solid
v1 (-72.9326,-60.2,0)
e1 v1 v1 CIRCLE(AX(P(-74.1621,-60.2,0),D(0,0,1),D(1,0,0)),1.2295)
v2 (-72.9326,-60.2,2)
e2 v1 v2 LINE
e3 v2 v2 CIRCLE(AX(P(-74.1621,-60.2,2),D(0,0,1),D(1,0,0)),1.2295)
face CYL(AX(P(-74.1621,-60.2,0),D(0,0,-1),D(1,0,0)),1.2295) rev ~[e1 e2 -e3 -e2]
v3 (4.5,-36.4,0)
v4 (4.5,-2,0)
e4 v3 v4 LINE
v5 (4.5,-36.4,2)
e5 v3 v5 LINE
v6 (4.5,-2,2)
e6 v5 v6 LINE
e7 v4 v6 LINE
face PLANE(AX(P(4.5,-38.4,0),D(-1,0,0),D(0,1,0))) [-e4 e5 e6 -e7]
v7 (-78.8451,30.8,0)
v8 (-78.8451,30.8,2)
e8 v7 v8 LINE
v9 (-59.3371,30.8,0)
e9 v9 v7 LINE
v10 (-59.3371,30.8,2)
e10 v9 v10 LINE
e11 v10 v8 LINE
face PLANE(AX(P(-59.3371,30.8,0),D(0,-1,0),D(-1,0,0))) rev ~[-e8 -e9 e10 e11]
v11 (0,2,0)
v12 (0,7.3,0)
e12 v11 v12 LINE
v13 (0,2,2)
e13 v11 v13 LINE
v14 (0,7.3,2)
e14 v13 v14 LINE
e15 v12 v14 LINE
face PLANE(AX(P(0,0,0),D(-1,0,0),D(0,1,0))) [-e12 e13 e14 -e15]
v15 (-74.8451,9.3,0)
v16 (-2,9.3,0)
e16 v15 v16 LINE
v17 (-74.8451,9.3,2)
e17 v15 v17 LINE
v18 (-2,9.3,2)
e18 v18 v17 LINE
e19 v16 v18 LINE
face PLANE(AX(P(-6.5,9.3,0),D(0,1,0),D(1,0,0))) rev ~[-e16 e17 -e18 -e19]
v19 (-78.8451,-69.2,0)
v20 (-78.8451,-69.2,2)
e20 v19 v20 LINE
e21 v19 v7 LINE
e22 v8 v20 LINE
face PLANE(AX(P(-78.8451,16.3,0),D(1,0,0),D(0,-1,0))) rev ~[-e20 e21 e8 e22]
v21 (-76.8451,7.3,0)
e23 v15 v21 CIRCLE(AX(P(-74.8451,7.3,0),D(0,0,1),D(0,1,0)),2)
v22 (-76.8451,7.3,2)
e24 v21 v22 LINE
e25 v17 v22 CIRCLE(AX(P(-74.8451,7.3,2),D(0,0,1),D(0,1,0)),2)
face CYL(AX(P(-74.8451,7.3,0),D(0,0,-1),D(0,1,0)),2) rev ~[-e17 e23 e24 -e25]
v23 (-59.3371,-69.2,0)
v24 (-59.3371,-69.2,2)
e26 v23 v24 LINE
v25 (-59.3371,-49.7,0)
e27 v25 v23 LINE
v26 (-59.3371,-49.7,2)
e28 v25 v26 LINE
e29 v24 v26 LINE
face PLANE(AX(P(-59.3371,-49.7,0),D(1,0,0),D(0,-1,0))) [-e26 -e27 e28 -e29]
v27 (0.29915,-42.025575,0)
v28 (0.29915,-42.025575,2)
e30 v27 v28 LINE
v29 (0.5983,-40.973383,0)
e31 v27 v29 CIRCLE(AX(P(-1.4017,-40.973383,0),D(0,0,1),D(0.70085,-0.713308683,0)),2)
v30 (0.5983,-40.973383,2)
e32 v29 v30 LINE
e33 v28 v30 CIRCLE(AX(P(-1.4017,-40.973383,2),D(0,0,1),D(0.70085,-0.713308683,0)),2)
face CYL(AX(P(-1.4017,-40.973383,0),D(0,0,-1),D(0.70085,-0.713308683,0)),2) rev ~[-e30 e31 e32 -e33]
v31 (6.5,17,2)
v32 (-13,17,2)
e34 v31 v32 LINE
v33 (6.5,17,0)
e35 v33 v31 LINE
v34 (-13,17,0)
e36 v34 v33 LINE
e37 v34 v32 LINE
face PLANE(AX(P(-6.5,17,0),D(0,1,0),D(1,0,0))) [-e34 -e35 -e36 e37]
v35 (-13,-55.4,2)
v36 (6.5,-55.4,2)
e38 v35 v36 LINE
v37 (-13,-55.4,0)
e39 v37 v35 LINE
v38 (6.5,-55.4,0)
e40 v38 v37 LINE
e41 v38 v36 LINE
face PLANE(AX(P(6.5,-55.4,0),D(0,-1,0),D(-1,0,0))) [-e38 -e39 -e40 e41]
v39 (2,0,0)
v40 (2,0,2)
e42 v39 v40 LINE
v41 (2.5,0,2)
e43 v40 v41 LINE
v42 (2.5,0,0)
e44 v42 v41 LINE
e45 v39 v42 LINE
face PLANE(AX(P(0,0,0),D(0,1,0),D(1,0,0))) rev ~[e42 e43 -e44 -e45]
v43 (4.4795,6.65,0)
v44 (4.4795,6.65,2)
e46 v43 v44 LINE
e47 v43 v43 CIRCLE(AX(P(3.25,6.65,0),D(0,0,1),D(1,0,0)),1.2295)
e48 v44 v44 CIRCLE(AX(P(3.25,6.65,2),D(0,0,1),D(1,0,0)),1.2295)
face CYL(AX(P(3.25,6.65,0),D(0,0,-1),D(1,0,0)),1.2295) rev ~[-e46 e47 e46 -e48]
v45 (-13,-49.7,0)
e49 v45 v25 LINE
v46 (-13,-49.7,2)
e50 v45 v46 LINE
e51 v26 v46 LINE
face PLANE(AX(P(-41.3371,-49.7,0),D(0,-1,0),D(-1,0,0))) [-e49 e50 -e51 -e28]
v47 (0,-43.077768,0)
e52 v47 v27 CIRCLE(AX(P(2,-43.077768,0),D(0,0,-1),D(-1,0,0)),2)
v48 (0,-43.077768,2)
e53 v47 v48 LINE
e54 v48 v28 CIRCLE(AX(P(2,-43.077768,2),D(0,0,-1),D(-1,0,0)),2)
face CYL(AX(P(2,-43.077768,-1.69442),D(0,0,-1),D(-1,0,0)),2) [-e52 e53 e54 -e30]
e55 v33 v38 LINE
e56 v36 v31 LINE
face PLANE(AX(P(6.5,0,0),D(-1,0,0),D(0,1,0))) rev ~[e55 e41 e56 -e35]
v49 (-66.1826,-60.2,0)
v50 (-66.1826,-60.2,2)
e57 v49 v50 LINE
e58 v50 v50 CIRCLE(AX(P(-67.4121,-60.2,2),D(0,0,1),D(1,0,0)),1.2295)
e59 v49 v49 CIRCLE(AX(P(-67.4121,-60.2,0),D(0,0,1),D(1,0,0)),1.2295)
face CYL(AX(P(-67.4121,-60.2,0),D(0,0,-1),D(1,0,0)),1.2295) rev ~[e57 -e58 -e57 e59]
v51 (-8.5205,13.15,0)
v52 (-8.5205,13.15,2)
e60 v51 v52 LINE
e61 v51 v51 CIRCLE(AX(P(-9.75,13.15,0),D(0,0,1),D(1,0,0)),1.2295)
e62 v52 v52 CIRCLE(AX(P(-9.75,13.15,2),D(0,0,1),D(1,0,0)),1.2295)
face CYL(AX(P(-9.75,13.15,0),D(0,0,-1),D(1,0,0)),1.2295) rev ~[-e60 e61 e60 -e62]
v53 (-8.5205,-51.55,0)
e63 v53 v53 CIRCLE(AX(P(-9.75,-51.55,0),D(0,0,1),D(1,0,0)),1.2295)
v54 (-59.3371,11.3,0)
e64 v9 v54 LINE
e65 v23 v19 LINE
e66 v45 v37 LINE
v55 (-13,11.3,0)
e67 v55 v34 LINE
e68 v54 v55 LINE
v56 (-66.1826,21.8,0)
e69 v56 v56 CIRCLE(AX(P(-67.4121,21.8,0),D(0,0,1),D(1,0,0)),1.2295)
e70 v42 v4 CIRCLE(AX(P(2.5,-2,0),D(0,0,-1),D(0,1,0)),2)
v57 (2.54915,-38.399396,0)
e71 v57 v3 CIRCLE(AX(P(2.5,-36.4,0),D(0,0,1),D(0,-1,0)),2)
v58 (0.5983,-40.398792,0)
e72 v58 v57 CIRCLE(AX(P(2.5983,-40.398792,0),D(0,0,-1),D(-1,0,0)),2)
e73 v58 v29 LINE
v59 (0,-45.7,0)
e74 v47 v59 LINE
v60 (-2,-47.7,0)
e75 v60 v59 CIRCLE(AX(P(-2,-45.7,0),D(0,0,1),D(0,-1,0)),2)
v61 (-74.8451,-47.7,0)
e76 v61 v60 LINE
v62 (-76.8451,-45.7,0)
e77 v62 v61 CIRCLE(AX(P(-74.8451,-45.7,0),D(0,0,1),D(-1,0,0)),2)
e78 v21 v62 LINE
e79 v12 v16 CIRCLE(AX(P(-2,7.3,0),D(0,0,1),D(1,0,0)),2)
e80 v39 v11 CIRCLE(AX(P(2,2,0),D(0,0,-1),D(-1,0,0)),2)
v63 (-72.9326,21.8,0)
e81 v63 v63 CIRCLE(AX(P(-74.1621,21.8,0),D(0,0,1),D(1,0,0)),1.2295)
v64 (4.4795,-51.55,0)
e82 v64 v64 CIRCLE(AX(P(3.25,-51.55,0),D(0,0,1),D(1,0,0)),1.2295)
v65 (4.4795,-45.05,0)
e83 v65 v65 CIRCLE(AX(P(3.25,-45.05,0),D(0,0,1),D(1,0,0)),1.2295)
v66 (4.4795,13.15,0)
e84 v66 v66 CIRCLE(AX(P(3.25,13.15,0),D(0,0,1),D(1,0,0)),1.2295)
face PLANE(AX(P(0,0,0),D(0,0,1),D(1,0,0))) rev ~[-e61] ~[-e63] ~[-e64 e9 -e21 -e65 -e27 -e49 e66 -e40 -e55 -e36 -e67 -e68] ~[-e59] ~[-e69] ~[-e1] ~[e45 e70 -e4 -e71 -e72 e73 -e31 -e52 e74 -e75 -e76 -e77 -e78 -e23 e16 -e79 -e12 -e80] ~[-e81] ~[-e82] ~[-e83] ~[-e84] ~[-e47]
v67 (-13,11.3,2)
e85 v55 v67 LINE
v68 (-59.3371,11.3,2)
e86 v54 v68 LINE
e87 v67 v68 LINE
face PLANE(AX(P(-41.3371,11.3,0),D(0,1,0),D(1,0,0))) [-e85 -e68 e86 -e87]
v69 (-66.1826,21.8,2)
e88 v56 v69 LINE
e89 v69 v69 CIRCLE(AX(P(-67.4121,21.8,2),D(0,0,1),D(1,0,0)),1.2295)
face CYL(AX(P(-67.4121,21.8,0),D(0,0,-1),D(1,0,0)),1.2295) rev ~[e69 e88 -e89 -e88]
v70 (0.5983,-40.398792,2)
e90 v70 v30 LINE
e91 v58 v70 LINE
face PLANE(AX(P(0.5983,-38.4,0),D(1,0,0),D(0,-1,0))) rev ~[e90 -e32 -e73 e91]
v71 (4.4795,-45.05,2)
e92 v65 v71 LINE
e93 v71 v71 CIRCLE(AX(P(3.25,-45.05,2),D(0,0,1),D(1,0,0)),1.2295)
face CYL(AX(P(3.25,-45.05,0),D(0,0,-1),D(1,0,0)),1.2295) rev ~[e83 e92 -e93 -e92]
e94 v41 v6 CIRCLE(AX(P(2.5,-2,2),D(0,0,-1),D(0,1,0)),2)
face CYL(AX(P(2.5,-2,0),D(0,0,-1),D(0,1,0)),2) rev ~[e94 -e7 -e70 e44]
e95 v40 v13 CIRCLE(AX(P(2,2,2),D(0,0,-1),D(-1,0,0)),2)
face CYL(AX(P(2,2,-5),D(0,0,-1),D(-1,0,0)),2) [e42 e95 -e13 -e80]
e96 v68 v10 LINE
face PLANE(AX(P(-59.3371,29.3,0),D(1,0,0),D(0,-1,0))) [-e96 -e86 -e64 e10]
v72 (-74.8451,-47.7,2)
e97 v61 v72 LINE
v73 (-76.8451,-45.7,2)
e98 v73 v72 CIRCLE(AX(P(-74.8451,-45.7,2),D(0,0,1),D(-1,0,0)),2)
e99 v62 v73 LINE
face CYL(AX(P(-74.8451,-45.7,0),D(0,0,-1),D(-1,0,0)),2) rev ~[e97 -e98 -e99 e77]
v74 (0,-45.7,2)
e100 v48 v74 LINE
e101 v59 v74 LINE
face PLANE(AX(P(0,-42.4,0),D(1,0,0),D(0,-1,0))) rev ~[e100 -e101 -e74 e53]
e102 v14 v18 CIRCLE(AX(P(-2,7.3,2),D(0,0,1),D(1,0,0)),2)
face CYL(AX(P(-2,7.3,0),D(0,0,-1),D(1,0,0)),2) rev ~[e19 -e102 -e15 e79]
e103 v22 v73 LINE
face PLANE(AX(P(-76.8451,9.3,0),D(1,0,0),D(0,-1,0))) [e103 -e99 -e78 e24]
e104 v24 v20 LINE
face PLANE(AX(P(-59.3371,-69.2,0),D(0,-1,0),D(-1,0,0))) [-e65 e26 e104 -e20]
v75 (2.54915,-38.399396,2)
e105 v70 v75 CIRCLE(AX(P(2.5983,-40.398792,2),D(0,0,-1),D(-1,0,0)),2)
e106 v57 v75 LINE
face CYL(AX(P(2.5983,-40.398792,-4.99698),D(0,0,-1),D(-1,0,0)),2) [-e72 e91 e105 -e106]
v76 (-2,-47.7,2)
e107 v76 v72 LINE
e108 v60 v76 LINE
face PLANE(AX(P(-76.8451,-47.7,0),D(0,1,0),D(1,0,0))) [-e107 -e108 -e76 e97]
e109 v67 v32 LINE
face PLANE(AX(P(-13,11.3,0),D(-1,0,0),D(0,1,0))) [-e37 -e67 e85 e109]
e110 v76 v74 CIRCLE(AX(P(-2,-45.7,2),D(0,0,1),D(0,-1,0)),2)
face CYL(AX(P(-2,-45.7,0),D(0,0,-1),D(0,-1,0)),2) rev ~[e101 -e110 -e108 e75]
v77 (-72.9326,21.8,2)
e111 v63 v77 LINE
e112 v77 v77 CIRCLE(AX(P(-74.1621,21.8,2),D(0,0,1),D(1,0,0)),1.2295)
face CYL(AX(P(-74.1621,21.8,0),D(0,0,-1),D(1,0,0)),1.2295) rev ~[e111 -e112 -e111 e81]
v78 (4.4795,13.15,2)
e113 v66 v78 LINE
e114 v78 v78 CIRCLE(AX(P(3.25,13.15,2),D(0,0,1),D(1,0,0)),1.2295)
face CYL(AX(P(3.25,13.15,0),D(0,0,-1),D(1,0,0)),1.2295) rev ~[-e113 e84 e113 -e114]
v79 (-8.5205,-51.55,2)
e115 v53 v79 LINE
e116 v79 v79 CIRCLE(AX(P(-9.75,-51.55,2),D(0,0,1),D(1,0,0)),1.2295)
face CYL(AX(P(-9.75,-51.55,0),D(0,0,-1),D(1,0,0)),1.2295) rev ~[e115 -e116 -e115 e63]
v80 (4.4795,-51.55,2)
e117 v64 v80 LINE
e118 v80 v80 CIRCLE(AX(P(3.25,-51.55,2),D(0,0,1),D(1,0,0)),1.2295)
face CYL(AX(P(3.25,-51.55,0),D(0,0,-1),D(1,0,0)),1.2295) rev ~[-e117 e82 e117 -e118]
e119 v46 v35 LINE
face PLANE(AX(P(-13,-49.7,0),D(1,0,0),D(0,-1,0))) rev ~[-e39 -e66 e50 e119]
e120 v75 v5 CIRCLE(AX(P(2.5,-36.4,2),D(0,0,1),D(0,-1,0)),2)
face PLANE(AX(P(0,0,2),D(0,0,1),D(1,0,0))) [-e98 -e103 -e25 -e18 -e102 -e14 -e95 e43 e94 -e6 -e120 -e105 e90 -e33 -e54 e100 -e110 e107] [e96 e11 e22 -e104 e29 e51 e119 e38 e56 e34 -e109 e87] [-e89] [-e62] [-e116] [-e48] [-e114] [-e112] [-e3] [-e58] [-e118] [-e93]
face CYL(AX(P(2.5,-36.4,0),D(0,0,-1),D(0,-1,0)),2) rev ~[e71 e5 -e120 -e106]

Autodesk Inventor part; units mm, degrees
ref_plane "YZ Plane" through (0, 0, 0) normal (1, 0, 0) x (0, 1, 0)
ref_plane "XZ Plane" through (0, 0, 0) normal (0, 1, 0) x (-1, 0, 0)
ref_plane "XY Plane" through (0, 0, 0) normal (0, 0, 1) x (1, 0, 0)
sketch "Sketch1" plane through (0, 0, 0) normal (0, 0, 1) x (1, 0, 0)
  circle A0 centre (3.25, 6.65) radius 1.2295 projected
  line L0 (0, 0) -> (6.5, 0) projected
  line L1 (6.5, 0) -> (6.5, 9.3) projected
  line L2 (6.5, 9.3) -> (0, 9.3) projected
  line L3 (0, 0) -> (0, 9.3) projected
  circle A1 centre (3.25, 13.15) radius 1.2295 projected
  line L4 (0, 9.3) -> (6.5, 9.3) projected
  line L5 (6.5, 9.3) -> (6.5, 17) projected
  line L6 (0, 17) -> (6.5, 17) projected
  line L7 (0, 9.3) -> (0, 17) projected
  circle A2 centre (3.25, -45.05) radius 1.2295 projected
  line L8 (0.5983, -42.4) -> (0, -42.4) projected
  line L9 (0, -42.4) -> (0, -47.7) projected
  line L10 (0, -47.7) -> (6.5, -47.7) projected
  line L11 (6.5, -38.4) -> (6.5, -47.7) projected
  line L12 (0.5983, -38.4) -> (6.5, -38.4) projected
  line L13 (0.5983, -38.4) -> (0.5983, -42.4) projected
  circle A3 centre (3.25, -51.55) radius 1.2295 projected
  line L14 (0, -47.7) -> (6.5, -47.7) projected
  line L15 (0, -47.7) -> (0, -55.4) projected
  line L16 (6.5, -55.4) -> (0, -55.4) projected
  line L17 (6.5, -47.7) -> (6.5, -55.4) projected
  circle A4 centre (-9.75, -51.55) radius 1.2295 projected
  line L18 (-41.3371, -47.7) -> (-6.5, -47.7) projected
  line L19 (-41.3371, -47.7) -> (-41.3371, -49.7) projected
  line L20 (-13, -49.7) -> (-41.3371, -49.7) projected
  line L21 (-13, -49.7) -> (-13, -55.4) projected
  line L22 (-6.5, -55.4) -> (-13, -55.4) projected
  line L23 (-6.5, -47.7) -> (-6.5, -55.4) projected
  circle A5 centre (-9.75, 13.15) radius 1.2295 projected
  line L24 (-41.3371, 11.3) -> (-13, 11.3) projected
  line L25 (-41.3371, 9.3) -> (-41.3371, 11.3) projected
  line L26 (-41.3371, 9.3) -> (-6.5, 9.3) projected
  line L27 (-6.5, 9.3) -> (-6.5, 17) projected
  line L28 (-13, 17) -> (-6.5, 17) projected
  line L29 (-13, 11.3) -> (-13, 17) projected
  arc A6 (-64.7971, 16.2257) -> (-64.1621, 16.7072) centre (-64.6621, 16.7072) ccw projected
  line L30 (-64.1621, 16.7072) -> (-64.1621, 23.8) projected
  arc A7 (-64.1621, 23.8) -> (-67.1621, 26.8) centre (-67.1621, 23.8) ccw projected
  line L31 (-67.1621, 26.8) -> (-70.1621, 26.8) projected
  line L32 (-70.1621, 26.8) -> (-70.1621, 29.3) projected
  line L33 (-70.1621, 29.3) -> (-59.3371, 29.3) projected
  line L34 (-59.3371, 29.3) -> (-59.3371, 30.8) projected
  line L35 (-59.3371, 30.8) -> (-78.8451, 30.8) projected
  line L36 (-78.8451, 16.3) -> (-78.8451, 30.8) projected
  line L37 (-65.3371, 16.3) -> (-78.8451, 16.3) projected
  arc A8 (-64.7971, 16.2257) -> (-65.3371, 16.3) centre (-65.3371, 14.3) ccw projected
  circle A9 centre (-67.4121, 21.8) radius 1.2295 projected
  circle A10 centre (-74.1621, 21.8) radius 1.2295 projected
  circle A11 centre (-67.4121, -60.2) radius 1.2295 projected
  circle A12 centre (-74.1621, -60.2) radius 1.2295 projected
  arc A13 (-64.1621, -55.1072) -> (-64.7971, -54.6257) centre (-64.6621, -55.1072) ccw projected
  arc A14 (-65.3371, -54.7) -> (-64.7971, -54.6257) centre (-65.3371, -52.7) ccw projected
  line L38 (-65.3371, -54.7) -> (-78.8451, -54.7) projected
  line L39 (-78.8451, -54.7) -> (-78.8451, -69.2) projected
  line L40 (-59.3371, -69.2) -> (-78.8451, -69.2) projected
  line L41 (-59.3371, -67.7) -> (-59.3371, -69.2) projected
  line L42 (-59.3371, -67.7) -> (-70.1621, -67.7) projected
  line L43 (-70.1621, -67.7) -> (-70.1621, -65.2) projected
  line L44 (-70.1621, -65.2) -> (-67.1621, -65.2) projected
  arc A15 (-67.1621, -65.2) -> (-64.1621, -62.2) centre (-67.1621, -62.2) ccw projected
  line L45 (-64.1621, -62.2) -> (-64.1621, -55.1072) projected
  line L46 (-59.3371, 30.8) -> (-59.3371, 11.3)
  line L47 (-59.3371, 11.3) -> (-41.3371, 11.3)
  line L48 (-41.3371, 9.3) -> (-76.8451, 9.3)
  line L49 (-78.8451, 16.3) -> (-78.8451, -54.7)
  line L50 (-76.8451, 9.3) -> (-76.8451, -47.7)
  line L51 (-76.8451, -47.7) -> (-41.3371, -47.7)
  line L52 (-41.3371, -49.7) -> (-59.3371, -49.7)
  line L53 (-59.3371, -49.7) -> (-59.3371, -67.7)
  line L54 (-6.5, 17) -> (0, 17)
  line L55 (-6.5, 9.3) -> (0, 9.3)
  line L56 (-6.5, -47.7) -> (0, -47.7)
  line L57 (-6.5, -55.4) -> (0, -55.4)
  line L58 (6.5, 0) -> (6.5, -38.4)
  line L59 (4.5, -38.4) -> (4.5, 0)
  dimension "d0" = 2
  dimension "d1" = 2
extrude "Extrusion1" add sketch "Sketch1" along normal blind 2 contours L3 L2 L1 L0 | L0 L58 L12 L59 | L7 L6 L5 L2 | L55 L27 L54 L7 | L12 L11 L10 L9 L8 L13 | L26 L25 L24 L29 L28 L27 | L48 L50 L51 L19 L52 L53 L42 L43 L44 A15 L45 A13 A14 L38 L49 L37 A8 A6 L30 A7 L31 L32 L33 L46 L47 L25 | L17 L16 L15 L10 | L15 L57 L23 L56 | L23 L22 L21 L20 L19 L18 | L33 L32 L31 A7 L30 A6 A8 L37 L36 L35 L34 | L41 L40 L39 L38 A14 A13 L45 A15 L44 L43 L42
fillet "Fillet1" radius 2 10 edges at (-76.8451, 9.3, 1) (-76.8451, -47.7, 1) (0.5983, -42.4, 1) (0, -42.4, 1) (0.5983, -38.4, 1) (4.5, -38.4, 1) (0, -47.7, 1) (0, 9.3, 1) (0, 0, 1) (4.5, 0, 1)
properties part number "CeilUphold"
